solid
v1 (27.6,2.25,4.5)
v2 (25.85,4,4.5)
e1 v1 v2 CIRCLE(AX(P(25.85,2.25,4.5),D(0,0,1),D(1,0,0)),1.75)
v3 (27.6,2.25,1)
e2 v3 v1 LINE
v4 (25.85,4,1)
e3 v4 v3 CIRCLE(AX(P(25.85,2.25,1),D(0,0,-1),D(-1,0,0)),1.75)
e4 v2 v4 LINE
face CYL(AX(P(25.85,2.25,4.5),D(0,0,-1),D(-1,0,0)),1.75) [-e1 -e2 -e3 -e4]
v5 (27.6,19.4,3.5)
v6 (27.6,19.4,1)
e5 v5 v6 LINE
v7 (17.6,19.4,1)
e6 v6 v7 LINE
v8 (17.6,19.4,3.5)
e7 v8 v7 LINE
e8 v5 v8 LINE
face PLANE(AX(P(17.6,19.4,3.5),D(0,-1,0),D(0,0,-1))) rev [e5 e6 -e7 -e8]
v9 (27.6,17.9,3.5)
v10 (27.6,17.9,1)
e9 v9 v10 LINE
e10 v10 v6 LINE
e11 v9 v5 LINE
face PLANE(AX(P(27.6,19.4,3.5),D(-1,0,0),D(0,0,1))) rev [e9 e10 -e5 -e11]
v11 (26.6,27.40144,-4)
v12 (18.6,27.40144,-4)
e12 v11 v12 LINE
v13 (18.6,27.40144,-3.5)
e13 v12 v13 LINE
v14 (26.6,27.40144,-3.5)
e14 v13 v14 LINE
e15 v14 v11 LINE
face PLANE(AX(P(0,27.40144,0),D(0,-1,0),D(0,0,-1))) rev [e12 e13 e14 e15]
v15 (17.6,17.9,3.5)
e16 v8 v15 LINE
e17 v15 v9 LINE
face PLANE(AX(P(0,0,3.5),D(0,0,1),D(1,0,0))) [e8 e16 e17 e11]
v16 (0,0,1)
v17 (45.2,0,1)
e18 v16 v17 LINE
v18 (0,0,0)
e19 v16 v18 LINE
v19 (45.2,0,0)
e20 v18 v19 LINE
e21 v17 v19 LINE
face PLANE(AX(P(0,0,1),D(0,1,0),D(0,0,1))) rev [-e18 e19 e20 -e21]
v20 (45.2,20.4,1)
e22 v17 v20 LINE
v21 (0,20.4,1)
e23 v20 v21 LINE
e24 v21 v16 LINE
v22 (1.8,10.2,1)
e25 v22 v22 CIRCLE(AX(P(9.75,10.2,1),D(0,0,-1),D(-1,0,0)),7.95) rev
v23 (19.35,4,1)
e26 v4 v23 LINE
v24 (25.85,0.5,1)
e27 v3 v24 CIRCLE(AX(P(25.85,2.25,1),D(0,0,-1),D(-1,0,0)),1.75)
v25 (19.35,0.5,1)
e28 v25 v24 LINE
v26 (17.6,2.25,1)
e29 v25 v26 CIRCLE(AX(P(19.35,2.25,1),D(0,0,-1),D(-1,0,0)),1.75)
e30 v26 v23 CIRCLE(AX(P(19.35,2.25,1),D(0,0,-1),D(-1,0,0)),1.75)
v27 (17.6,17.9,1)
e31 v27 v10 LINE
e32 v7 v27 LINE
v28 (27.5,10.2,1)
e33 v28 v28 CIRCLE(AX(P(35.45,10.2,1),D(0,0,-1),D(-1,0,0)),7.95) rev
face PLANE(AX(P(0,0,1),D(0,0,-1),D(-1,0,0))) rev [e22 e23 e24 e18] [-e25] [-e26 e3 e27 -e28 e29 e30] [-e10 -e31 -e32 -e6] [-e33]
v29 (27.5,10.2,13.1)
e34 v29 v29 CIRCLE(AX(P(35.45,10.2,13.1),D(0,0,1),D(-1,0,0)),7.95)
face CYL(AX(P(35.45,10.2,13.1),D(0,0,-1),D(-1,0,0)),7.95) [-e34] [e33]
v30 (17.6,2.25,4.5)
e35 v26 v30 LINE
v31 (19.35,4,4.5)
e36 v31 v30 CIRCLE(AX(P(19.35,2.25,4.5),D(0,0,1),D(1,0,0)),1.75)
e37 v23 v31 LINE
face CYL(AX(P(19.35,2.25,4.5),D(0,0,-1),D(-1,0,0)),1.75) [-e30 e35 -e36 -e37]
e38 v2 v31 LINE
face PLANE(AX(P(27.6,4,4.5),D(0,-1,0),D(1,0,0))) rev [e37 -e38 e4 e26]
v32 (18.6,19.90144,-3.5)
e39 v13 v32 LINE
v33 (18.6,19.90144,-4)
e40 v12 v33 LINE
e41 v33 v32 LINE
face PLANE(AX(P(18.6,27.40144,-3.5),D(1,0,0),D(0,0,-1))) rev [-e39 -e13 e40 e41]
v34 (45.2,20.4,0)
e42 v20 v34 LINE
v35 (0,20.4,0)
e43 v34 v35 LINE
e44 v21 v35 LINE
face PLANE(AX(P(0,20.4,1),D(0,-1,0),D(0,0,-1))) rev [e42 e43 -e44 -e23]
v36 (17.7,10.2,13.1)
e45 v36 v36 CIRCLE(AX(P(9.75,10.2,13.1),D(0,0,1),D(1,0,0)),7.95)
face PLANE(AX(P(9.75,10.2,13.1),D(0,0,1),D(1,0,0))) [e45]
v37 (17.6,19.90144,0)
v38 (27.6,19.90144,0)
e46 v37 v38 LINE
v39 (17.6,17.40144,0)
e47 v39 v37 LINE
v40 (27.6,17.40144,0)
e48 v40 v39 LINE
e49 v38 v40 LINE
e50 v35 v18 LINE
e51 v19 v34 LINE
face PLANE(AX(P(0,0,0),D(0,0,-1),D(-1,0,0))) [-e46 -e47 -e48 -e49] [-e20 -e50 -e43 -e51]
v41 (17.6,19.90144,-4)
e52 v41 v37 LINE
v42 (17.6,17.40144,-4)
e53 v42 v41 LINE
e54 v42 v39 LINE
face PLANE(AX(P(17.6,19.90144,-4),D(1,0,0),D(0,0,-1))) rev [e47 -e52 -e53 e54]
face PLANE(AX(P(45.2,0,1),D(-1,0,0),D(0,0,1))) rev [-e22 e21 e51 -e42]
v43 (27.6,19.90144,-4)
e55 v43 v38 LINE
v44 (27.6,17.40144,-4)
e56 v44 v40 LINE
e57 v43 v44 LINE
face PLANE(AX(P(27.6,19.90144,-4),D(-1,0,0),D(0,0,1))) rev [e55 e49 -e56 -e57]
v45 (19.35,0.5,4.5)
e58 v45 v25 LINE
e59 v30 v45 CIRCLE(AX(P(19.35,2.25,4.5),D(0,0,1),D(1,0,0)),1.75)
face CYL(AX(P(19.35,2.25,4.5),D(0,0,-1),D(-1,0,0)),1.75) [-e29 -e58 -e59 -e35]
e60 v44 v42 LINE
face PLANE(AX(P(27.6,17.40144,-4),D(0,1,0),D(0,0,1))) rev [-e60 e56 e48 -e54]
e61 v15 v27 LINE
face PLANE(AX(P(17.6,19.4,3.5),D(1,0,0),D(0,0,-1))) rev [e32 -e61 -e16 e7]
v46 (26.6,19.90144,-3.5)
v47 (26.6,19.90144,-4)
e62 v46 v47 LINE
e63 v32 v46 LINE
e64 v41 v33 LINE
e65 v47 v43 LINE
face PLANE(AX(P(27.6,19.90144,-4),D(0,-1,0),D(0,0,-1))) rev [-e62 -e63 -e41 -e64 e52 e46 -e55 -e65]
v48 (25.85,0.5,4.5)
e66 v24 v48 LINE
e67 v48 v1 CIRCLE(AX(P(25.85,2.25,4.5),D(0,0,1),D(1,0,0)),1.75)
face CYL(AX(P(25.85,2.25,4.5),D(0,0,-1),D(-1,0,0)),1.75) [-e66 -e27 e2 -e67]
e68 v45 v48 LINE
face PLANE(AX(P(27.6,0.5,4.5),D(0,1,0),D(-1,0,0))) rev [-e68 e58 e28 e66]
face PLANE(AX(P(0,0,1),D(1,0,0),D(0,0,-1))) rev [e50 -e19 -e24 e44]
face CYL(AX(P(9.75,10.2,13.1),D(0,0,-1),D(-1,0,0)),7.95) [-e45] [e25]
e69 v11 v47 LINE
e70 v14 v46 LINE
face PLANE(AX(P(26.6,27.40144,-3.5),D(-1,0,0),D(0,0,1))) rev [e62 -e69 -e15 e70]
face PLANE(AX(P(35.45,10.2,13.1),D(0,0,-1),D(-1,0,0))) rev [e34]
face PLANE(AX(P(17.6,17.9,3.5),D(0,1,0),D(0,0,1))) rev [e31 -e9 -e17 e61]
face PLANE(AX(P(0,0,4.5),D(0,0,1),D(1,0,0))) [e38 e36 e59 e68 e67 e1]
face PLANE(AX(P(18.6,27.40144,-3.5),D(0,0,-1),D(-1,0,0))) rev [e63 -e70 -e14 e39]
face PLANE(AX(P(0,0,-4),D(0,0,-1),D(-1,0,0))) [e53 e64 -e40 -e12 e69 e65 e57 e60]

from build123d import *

# Parameters (mm, degrees)
ESBO_O1_W                = 45.2
ESBO_O1_H                = 20.4
RESSALTO_EXTRUS_O1_DEPTH = 1
ESBO_O2_R                = 7.95
RESSALTO_EXTRUS_O2_DEPTH = 12.1
ESBO_O3_W                = 10
ESBO_O3_H                = 3.5
RESSALTO_EXTRUS_O3_DEPTH = 3.5
FILETE1_R                = 1.75
ESBO_O4_W                = 10
ESBO_O4_H                = 2.5
RESSALTO_EXTRUS_O4_DEPTH = 4
ESBO_O5_W                = 8
ESBO_O5_H                = 0.5
RESSALTO_EXTRUS_O5_DEPTH = 7.5
ESBO_O7_W                = 10
ESBO_O7_H                = 1.5
RESSALTO_EXTRUS_O6_DEPTH = 2.5


with BuildPart() as part:
    # Esboço1 → Ressalto-extrusão1 (new body)
    with BuildSketch(Plane.XY):
        with Locations((22.6, 10.2)):
            Rectangle(ESBO_O1_W, ESBO_O1_H)
    extrude(amount=RESSALTO_EXTRUS_O1_DEPTH)

    # Esboço2 → Ressalto-extrusão2 (add)
    with BuildSketch(Plane.XY.offset(1)):
        with Locations(Location((9.75, 10.2, 0), (0, 0, 180))):
            Circle(ESBO_O2_R)
        with Locations(Location((35.45, 10.2, 0), (0, 0, 180))):
            Circle(ESBO_O2_R)
    extrude(amount=RESSALTO_EXTRUS_O2_DEPTH)

    # Esboço3 → Ressalto-extrusão3 (add)
    with BuildSketch(Plane.XY.offset(1)):
        with Locations((22.6, 2.25)):
            Rectangle(ESBO_O3_W, ESBO_O3_H)
    extrude(amount=RESSALTO_EXTRUS_O3_DEPTH)

    # Filete1
    filete1_edges = [part.edges().sort_by_distance(p)[0] for p in [
        (27.6, 0.5, 2.75),
        (27.6, 4, 2.75),
        (17.6, 4, 2.75),
        (17.6, 0.5, 2.75),
    ]]
    fillet(filete1_edges, radius=FILETE1_R - 0.0001)  # a hair under: the kernel refuses the full size

    # Esboço4 → Ressalto-extrusão4 (add)
    with BuildSketch(Plane(origin=(0, 0, 0), x_dir=(-1, 0, 0), z_dir=(0, 0, -1))):
        with Locations((-22.6, 18.651439954)):
            Rectangle(ESBO_O4_W, ESBO_O4_H)
    extrude(amount=RESSALTO_EXTRUS_O4_DEPTH)

    # Esboço5 → Ressalto-extrusão5 (add)
    with BuildSketch(Plane(origin=(0, 19.901439954, 0), x_dir=(1, 0, 0), z_dir=(0, 1, 0))):
        with Locations((22.6, 3.75)):
            Rectangle(ESBO_O5_W, ESBO_O5_H)
    extrude(amount=RESSALTO_EXTRUS_O5_DEPTH)

    # Esboço7 → Ressalto-extrusão6 (add)
    with BuildSketch(Plane.XY.offset(1)):
        with Locations((22.6, 18.65)):
            Rectangle(ESBO_O7_W, ESBO_O7_H)
    extrude(amount=RESSALTO_EXTRUS_O6_DEPTH)


solid = part.part
